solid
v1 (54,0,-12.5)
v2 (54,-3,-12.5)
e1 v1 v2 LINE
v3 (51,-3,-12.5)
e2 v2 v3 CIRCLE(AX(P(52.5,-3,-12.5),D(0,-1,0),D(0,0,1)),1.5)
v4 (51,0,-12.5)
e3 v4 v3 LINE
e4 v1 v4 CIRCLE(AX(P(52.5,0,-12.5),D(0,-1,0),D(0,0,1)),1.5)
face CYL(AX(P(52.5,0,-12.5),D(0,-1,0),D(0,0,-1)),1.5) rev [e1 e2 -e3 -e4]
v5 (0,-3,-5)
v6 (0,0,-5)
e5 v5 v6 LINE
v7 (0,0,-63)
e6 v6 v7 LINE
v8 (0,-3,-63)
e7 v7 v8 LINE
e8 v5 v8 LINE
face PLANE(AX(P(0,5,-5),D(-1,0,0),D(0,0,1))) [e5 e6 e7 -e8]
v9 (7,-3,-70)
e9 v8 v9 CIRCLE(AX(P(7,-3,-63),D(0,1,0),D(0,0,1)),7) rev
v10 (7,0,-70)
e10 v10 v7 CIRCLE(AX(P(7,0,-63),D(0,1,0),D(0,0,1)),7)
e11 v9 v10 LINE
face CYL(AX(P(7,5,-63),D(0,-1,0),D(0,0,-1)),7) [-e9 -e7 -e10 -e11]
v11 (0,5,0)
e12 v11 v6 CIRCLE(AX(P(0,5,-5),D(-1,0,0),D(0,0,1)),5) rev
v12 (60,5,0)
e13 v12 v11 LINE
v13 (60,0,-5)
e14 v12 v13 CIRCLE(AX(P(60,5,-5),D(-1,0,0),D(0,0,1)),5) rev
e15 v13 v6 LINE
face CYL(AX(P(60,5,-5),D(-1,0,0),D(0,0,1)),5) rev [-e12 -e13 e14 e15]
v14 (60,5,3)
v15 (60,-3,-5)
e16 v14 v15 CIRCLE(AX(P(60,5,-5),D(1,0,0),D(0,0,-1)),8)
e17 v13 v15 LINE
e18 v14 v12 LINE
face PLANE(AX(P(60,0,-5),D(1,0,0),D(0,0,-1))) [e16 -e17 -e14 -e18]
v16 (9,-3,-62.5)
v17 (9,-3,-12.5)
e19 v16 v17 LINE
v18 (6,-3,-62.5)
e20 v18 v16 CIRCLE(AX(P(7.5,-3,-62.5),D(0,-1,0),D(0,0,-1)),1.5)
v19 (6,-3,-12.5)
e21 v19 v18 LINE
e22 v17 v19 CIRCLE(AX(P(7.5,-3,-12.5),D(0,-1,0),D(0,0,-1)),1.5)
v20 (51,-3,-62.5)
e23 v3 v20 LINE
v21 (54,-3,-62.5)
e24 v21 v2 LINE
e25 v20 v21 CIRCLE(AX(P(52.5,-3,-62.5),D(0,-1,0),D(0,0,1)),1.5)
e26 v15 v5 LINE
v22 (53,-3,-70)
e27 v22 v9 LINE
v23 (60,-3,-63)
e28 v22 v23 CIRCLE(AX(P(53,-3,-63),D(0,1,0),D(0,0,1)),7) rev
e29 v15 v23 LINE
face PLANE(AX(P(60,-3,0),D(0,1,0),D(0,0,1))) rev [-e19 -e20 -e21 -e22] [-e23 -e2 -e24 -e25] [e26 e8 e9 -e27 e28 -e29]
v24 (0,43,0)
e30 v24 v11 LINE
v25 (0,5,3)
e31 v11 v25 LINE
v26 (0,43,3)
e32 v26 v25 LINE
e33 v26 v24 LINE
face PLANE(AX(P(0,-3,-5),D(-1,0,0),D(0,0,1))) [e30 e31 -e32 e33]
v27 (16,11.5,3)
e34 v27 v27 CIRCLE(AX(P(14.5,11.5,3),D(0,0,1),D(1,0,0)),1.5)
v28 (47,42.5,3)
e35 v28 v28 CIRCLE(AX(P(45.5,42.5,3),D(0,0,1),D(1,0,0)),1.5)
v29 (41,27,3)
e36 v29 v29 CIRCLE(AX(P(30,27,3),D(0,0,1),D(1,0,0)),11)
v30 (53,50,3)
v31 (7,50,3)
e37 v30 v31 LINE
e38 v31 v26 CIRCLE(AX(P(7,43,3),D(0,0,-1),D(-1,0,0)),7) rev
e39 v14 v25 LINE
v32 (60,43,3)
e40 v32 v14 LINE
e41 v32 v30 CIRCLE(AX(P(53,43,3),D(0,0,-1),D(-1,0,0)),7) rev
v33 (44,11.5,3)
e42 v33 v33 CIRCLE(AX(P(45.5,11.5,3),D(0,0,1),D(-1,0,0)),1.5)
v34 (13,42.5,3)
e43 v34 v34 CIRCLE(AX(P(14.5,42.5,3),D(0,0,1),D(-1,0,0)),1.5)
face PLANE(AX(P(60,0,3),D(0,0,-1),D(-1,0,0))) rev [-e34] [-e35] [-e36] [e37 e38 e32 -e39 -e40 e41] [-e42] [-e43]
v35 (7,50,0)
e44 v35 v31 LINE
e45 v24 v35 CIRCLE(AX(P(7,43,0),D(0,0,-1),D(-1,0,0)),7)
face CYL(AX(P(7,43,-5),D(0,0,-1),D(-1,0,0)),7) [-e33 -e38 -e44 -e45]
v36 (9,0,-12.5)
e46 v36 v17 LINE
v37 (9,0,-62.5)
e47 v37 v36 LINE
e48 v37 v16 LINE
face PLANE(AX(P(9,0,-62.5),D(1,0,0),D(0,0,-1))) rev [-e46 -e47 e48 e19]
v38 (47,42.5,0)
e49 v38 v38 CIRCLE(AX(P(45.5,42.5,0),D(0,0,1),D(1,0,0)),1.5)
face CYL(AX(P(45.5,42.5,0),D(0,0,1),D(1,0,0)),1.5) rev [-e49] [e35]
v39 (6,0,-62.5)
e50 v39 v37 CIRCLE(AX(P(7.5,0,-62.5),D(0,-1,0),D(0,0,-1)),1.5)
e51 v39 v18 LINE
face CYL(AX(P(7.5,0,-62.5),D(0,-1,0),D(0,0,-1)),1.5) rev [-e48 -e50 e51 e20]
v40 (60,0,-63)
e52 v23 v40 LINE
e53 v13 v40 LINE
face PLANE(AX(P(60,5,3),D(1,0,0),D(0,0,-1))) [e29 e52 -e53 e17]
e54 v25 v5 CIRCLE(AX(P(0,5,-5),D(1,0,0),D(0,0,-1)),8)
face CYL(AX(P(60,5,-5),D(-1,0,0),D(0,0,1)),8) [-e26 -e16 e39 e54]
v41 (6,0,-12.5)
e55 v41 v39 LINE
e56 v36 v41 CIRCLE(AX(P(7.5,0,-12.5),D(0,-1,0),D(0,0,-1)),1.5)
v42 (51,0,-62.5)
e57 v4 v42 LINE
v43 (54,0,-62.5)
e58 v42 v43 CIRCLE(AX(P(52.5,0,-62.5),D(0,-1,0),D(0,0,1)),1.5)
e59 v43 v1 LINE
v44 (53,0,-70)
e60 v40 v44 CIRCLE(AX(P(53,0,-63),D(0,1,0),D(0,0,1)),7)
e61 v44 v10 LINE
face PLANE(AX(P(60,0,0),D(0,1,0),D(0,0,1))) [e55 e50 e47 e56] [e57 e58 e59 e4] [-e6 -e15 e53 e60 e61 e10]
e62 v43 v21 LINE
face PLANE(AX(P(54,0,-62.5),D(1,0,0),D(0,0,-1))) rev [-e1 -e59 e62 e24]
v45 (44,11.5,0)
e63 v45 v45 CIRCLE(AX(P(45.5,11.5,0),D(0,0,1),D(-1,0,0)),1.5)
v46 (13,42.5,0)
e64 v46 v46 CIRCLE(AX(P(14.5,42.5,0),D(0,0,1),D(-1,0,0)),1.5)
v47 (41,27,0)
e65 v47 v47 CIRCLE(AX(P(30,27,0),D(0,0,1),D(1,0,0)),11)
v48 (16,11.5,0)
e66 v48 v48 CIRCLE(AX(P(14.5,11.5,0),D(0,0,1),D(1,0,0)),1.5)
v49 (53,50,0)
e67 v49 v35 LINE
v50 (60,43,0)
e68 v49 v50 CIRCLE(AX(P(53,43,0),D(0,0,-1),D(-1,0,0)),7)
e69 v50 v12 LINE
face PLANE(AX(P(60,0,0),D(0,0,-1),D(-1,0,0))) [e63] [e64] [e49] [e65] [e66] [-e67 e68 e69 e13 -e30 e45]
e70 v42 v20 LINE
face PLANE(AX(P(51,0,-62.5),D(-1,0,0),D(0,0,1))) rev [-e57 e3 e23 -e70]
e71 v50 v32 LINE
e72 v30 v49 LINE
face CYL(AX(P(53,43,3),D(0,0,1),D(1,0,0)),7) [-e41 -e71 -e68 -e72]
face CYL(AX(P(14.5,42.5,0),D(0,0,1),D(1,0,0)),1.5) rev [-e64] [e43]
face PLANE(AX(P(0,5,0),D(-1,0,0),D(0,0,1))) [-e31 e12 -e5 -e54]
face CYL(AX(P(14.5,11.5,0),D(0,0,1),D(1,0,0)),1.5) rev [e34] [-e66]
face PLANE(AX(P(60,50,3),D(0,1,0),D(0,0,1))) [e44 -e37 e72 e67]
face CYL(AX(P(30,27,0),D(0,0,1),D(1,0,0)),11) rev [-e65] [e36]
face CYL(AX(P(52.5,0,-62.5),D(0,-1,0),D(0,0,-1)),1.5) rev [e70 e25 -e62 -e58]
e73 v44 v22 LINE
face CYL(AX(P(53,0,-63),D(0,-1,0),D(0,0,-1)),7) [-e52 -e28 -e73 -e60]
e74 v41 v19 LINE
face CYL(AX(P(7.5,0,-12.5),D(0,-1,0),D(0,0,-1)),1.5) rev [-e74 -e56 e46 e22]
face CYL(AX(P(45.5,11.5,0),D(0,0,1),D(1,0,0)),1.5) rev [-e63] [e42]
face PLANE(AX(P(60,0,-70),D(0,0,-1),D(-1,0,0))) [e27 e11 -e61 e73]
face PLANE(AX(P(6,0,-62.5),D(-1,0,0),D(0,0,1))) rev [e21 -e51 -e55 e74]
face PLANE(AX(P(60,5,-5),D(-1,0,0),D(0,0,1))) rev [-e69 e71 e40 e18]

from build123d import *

# Parameters (mm, degrees)
BASE_FLANGE1_DEPTH = 60
SKETCH6_R          = 11
SKETCH6_R_2        = 1.5
CUT_EXTRUDE1_DEPTH = 10
CUT_EXTRUDE2_DEPTH = 3
FILLET1_R          = 7


# Read off the part's stored shape, not the designer's step: Base-Flange1
with BuildPart() as part:
    # Base-Flange1 outline → Base-Flange1 (new body)
    with BuildSketch(Plane(origin=(0, 0, 0), x_dir=(0, 0, -1), z_dir=(1, 0, 0))):
        with BuildLine():
            Line((5, -3), (70, -3))
            Line((70, -3), (70, 0))
            Line((70, 0), (5, 0))
            ThreePointArc((5, 0), (1.464466094, 1.464466094), (0, 5))
            Line((0, 5), (0, 50))
            Line((0, 50), (-3, 50))
            Line((-3, 50), (-3, 5))
            ThreePointArc((-3, 5), (-0.656854249, -0.656854249), (5, -3))
        make_face()
    extrude(amount=BASE_FLANGE1_DEPTH)

    # Sketch6 → Cut-Extrude1 (cut)
    with BuildSketch(Plane.XY.offset(3)):
        with Locations((30, 27)):
            Circle(SKETCH6_R)
        with Locations((45.5, 42.5)):
            Circle(SKETCH6_R_2)
        with Locations(Location((14.5, 42.5, 0), (0, 0, 180))):
            Circle(SKETCH6_R_2)
        with Locations((14.5, 11.5)):
            Circle(SKETCH6_R_2)
        with Locations(Location((45.5, 11.5, 0), (0, 0, 180))):
            Circle(SKETCH6_R_2)
    extrude(amount=-CUT_EXTRUDE1_DEPTH, mode=Mode.SUBTRACT)

    # Sketch7 → Cut-Extrude2 (cut)
    with BuildSketch(Plane.XZ.offset(3)):
        with BuildLine():
            Line((6, -62.5), (6, -12.5))
            ThreePointArc((6, -12.5), (7.5, -11), (9, -12.5))
            Line((9, -12.5), (9, -62.5))
            ThreePointArc((9, -62.5), (7.5, -64), (6, -62.5))
        make_face()
        with BuildLine():
            Line((54, -62.5), (54, -12.5))
            ThreePointArc((54, -12.5), (52.5, -11), (51, -12.5))
            Line((51, -12.5), (51, -62.5))
            ThreePointArc((51, -62.5), (52.5, -64), (54, -62.5))
        make_face()
    extrude(amount=-CUT_EXTRUDE2_DEPTH, mode=Mode.SUBTRACT)

    # Fillet1
    fillet1_edges = [part.edges().sort_by_distance(p)[0] for p in [
        (60, 50, 1.5),
        (60, -1.5, -70),
        (0, 50, 1.5),
        (0, -1.5, -70),
    ]]
    fillet(fillet1_edges, radius=FILLET1_R)


solid = part.part
